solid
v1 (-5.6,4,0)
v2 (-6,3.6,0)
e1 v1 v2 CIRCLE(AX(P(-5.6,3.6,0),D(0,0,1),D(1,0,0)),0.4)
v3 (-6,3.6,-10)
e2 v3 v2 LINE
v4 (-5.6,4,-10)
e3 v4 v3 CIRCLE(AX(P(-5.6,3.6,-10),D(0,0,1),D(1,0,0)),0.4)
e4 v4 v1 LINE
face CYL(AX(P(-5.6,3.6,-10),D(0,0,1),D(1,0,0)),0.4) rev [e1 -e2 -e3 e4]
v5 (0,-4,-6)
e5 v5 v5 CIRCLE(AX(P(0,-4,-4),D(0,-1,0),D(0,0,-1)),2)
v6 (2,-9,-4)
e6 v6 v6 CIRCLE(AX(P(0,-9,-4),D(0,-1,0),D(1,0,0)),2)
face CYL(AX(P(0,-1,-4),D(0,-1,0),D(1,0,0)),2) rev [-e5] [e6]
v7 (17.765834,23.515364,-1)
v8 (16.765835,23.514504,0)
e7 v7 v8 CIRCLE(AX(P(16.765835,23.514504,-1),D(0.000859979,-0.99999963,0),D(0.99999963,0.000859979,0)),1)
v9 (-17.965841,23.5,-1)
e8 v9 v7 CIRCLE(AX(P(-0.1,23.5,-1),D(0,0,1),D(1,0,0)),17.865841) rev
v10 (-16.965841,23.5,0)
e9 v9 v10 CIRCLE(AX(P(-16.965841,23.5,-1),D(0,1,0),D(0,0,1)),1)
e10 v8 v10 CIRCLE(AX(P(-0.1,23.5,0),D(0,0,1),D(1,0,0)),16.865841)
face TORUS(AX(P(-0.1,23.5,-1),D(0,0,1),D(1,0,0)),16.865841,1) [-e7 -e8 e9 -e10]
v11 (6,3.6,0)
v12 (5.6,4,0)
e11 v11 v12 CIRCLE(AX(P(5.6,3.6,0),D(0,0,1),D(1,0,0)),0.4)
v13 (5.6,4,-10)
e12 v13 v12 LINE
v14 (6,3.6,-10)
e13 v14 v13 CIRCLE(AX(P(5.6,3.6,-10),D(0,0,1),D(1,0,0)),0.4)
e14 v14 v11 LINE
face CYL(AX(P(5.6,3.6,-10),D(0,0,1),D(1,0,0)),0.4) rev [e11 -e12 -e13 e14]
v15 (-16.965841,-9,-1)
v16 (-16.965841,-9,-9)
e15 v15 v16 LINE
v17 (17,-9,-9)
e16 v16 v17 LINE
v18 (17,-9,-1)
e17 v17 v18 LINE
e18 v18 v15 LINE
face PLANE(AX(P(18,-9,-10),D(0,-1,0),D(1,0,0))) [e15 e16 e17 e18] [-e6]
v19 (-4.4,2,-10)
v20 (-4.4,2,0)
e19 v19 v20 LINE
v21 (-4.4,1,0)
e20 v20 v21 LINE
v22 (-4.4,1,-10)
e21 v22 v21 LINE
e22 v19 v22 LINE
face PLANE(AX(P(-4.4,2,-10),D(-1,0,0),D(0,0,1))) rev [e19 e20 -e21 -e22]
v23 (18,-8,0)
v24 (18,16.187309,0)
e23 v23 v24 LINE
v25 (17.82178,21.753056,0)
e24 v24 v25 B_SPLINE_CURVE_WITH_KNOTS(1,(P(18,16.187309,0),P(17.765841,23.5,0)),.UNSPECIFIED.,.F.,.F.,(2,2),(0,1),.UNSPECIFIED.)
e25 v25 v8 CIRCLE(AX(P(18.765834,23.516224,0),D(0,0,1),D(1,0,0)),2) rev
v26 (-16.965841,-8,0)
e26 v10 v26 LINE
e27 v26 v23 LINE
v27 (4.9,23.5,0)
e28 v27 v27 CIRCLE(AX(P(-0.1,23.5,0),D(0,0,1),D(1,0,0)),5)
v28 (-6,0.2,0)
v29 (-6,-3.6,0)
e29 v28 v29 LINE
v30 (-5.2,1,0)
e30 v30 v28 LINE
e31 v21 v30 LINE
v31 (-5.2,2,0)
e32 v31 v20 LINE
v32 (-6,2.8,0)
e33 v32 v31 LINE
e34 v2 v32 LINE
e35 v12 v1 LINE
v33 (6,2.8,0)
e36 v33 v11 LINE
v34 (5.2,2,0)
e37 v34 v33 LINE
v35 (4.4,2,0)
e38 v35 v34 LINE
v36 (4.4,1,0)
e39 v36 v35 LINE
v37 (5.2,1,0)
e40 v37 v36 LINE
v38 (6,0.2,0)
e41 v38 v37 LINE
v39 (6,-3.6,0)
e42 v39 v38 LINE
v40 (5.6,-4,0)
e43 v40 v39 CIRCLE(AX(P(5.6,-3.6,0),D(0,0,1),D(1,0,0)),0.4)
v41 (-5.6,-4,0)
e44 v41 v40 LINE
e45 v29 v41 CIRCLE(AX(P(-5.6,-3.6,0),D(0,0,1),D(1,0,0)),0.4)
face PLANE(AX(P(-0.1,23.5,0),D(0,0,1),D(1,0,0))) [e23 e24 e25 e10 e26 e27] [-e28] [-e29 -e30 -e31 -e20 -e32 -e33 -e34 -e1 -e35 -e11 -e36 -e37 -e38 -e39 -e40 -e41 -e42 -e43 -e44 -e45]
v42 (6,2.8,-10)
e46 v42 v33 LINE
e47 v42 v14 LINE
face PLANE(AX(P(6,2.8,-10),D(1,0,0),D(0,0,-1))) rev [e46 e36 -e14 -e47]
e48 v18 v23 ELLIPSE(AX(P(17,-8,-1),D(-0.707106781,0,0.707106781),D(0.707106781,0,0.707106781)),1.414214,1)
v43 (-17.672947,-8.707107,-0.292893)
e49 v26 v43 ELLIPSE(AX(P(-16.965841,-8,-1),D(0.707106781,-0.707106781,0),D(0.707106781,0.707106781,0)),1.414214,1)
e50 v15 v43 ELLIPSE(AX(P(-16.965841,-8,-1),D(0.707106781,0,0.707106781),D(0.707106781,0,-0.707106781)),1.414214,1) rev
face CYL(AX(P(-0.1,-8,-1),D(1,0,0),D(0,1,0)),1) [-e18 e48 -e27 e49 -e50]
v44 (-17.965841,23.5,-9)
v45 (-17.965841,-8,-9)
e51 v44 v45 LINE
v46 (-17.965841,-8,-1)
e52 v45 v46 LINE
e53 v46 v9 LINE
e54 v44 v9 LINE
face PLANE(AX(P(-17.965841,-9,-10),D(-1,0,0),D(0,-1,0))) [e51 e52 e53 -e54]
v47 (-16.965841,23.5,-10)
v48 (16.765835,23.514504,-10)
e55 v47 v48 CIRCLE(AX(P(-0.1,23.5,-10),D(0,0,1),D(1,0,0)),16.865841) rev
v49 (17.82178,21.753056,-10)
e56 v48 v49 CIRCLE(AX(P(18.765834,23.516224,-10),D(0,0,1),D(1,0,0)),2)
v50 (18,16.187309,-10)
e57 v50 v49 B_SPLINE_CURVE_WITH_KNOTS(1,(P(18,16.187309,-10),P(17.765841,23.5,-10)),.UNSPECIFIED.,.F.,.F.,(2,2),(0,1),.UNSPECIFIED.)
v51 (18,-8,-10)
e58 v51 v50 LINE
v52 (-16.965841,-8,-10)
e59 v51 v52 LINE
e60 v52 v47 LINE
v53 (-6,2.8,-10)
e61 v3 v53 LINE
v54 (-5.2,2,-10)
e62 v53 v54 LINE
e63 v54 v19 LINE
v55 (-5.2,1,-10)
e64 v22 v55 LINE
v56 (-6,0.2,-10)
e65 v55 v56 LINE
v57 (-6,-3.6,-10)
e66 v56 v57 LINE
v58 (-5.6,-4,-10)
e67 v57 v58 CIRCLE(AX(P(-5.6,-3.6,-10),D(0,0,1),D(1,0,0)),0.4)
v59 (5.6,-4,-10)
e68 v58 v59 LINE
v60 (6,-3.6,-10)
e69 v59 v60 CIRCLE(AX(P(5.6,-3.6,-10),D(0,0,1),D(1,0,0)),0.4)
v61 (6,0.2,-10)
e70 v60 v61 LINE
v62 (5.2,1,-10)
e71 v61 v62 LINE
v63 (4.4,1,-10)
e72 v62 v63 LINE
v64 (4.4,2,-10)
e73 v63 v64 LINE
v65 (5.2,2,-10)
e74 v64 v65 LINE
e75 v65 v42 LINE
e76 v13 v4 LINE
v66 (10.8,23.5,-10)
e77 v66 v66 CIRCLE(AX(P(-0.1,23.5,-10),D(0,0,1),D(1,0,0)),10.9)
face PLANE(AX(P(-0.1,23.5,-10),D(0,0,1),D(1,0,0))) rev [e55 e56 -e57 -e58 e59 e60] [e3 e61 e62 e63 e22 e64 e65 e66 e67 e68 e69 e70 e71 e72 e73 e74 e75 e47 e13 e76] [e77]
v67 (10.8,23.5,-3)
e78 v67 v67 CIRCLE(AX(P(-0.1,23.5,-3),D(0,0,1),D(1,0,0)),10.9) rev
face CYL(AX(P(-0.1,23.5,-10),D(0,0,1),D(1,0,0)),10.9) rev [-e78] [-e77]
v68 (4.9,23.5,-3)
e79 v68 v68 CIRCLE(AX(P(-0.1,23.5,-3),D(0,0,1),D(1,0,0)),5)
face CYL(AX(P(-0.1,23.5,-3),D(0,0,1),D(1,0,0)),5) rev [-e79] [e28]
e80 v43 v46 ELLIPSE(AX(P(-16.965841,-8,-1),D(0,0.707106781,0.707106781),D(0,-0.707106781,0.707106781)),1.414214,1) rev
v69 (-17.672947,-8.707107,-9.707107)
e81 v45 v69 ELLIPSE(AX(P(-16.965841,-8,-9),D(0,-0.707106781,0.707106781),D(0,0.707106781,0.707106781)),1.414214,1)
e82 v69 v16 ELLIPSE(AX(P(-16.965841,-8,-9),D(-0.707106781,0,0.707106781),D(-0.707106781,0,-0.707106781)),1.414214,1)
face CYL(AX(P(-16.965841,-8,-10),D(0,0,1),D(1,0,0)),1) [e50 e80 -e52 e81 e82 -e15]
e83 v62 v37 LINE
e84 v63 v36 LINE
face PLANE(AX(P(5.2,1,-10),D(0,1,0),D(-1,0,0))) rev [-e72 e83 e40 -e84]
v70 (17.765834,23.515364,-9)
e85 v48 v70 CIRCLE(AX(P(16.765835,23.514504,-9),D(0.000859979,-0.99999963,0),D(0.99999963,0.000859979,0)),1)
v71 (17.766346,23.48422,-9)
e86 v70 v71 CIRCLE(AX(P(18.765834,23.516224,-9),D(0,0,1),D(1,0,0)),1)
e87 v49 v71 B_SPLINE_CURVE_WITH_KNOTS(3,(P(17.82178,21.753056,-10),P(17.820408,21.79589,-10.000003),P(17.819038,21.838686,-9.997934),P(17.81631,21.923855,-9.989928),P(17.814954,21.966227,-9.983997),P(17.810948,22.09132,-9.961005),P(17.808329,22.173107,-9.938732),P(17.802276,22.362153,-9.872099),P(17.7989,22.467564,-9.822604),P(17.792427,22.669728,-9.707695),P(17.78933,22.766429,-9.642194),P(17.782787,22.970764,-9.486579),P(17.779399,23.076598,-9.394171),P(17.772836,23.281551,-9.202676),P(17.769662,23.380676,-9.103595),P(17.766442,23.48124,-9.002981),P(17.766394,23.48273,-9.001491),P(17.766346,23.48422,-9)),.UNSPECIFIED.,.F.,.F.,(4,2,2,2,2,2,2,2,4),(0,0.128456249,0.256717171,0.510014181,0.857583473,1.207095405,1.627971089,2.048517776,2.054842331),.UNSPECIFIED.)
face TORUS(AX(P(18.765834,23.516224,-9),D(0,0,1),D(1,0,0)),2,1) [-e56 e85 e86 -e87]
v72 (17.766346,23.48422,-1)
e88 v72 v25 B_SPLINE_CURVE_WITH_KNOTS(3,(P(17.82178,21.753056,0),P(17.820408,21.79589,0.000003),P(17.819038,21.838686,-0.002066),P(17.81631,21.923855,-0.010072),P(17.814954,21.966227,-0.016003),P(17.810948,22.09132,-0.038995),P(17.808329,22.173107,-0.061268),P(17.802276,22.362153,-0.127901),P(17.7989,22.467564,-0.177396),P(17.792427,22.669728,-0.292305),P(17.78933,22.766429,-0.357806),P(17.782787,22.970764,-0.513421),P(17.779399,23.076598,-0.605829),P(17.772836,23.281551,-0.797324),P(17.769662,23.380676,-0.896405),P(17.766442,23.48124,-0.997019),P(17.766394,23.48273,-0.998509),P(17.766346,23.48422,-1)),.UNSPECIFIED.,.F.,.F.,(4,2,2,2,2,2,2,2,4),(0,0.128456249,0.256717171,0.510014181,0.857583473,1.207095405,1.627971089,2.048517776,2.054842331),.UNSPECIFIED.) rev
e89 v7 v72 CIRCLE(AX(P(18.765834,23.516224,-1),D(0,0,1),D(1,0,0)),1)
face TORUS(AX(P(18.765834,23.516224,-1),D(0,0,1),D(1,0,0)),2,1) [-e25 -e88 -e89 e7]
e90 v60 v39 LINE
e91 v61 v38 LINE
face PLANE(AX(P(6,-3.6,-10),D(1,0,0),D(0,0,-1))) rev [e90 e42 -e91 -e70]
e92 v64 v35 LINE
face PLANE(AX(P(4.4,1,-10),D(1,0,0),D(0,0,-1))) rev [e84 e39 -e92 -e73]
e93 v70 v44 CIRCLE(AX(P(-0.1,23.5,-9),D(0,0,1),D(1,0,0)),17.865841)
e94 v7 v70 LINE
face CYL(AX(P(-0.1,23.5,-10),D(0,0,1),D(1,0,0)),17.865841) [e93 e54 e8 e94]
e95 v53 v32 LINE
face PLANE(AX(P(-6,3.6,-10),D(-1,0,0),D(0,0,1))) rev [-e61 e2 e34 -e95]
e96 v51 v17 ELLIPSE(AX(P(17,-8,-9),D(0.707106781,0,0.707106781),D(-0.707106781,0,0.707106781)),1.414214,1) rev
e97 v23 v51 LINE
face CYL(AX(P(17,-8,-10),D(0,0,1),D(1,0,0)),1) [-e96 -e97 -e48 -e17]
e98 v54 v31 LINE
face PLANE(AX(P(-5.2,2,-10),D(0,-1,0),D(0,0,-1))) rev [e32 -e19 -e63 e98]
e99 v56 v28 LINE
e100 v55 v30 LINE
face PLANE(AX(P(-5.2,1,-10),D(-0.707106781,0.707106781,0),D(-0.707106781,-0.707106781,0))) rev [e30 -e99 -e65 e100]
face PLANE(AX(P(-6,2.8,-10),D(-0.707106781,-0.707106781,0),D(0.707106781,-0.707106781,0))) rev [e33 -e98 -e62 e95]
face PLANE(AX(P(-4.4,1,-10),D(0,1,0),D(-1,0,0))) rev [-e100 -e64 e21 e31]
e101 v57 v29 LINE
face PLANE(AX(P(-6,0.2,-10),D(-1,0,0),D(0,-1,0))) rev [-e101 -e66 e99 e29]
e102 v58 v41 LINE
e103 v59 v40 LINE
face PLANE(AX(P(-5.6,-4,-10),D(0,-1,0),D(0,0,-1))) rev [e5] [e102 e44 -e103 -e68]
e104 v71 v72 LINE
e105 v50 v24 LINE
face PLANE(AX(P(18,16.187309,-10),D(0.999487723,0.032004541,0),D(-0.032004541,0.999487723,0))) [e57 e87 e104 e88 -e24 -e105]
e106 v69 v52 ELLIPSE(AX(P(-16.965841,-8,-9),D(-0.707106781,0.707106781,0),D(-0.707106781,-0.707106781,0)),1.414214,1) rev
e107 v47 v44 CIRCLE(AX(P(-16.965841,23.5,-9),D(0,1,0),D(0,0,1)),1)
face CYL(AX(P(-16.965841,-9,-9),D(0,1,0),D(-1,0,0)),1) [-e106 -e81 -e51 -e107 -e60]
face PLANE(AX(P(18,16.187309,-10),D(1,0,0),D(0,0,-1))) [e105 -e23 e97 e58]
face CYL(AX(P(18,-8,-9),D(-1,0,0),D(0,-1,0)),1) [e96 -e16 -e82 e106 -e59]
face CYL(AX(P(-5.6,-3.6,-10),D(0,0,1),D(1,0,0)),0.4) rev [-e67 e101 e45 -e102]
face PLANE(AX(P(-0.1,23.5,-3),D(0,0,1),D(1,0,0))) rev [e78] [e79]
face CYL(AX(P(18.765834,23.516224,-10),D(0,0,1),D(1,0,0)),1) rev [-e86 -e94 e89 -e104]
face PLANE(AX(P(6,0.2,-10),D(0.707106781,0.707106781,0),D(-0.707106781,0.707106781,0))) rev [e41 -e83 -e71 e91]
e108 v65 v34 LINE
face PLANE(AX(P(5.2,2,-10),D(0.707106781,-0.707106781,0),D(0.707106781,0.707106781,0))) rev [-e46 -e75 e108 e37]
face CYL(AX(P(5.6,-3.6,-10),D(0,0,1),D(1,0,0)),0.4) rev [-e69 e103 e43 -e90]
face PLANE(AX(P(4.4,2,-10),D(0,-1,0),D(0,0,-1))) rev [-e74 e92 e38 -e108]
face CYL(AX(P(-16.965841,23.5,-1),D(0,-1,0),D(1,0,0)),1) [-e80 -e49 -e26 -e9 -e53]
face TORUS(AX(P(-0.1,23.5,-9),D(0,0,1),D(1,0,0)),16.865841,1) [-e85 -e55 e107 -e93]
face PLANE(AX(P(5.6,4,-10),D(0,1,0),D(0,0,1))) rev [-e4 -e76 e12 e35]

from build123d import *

# Parameters (mm, degrees)
SKETCH1_R           = 10.9
BOSS_EXTRUDE1_DEPTH = 10
FILLET5_R           = 1
FILLET1_R           = 1
SKETCH3_R           = 2
CUT_EXTRUDE2_DEPTH  = 8
SKETCH6_R           = 11.874719229
SKETCH6_R_2         = 5
BOSS_EXTRUDE3_DEPTH = 3


with BuildPart() as part:
    # Sketch1 → Boss-Extrude1 (new body)
    with BuildSketch(Plane.XY):
        with BuildLine():
            Line((18.000000111, 2.53629242), (18.000000111, -9))
            Line((18.000000111, -9), (-17.965840671, -9))
            Line((-17.965840671, -9), (-17.965840671, 23.5))
            ThreePointArc((-17.965840671, 23.5), (-0.099999918, 41.365840754), (17.765840836, 23.5))
            Line((17.765840836, 23.5), (18.000000111, 16.187309001))
            Line((18.000000111, 16.187309001), (18.000000111, 14.96196947))
            Line((18.000000111, 14.96196947), (18.000000111, 2.53629242))
        make_face()
        with Locations((-0.099999918, 23.5)):
            Circle(SKETCH1_R, mode=Mode.SUBTRACT)
        with BuildLine():
            Line((-4.4, 1), (-5.2, 1))
            Line((-5.2, 1), (-6, 0.2))
            Line((-6, 0.2), (-6, -3.6))
            ThreePointArc((-6, -3.6), (-5.882842712, -3.882842712), (-5.6, -4))
            Line((-5.6, -4), (5.6, -4))
            ThreePointArc((5.6, -4), (5.882842712, -3.882842712), (6, -3.6))
            Line((6, -3.6), (6, 0.2))
            Line((6, 0.2), (5.2, 1))
            Line((5.2, 1), (4.4, 1))
            Line((4.4, 1), (4.4, 2))
            Line((4.4, 2), (5.2, 2))
            Line((5.2, 2), (6, 2.8))
            Line((6, 2.8), (6, 3.6))
            ThreePointArc((6, 3.6), (5.882842712, 3.882842712), (5.6, 4))
            Line((5.6, 4), (-5.6, 4))
            ThreePointArc((-5.6, 4), (-5.882842712, 3.882842712), (-6, 3.6))
            Line((-6, 3.6), (-6, 2.8))
            Line((-6, 2.8), (-5.2, 2))
            Line((-5.2, 2), (-4.4, 2))
            Line((-4.4, 2), (-4.4, 1))
        make_face(mode=Mode.SUBTRACT)
    extrude(amount=-BOSS_EXTRUDE1_DEPTH)

    # Fillet5
    fillet5_edges = [part.edges().sort_by_distance(p)[0] for p in [
        (18.000000111, -9, -5),
        (-17.965840671, -9, -5),
        (0.01707972, -9, -10),
        (0.01707972, -9, 0),
    ]]
    fillet(fillet5_edges, radius=FILLET5_R)

    # Fillet1
    # the kernel refuses this fillet: 1 mm, written as the material it adds along each edge
    with BuildSketch(Plane(origin=(17.765840836, 23.5, 0), x_dir=(0.032004541259538756, -0.9994877234557543, 0), z_dir=(0, 0, -1))) as fillet1_piece_1:
        with BuildLine():
            CenterArc((0.015788393, -1), FILLET1_R, 90, 1.784765128)
            ThreePointArc((-0.015356597, -0.000485123), (-0.007678246, -0.000244212), (0, 0))
            Line((0, 0), (0.015788393, 0))
        make_face()
    extrude(amount=10)
    # the kernel refuses this fillet: 1 mm, written as the material it takes off along each edge
    with BuildSketch(Plane(origin=(-17.965840671, -10.5, -10), x_dir=(1, 0, 0), z_dir=(0, 1, 0)), Plane(origin=(-17.965840671, -10.5, 0), x_dir=(0, 0, -1), z_dir=(0, 1, 0))) as fillet1_2_piece_1:
        with BuildLine():
            CenterArc((FILLET1_R, -FILLET1_R), FILLET1_R, 90, 90)
            Line((0, -FILLET1_R), (0, 0))
            Line((0, 0), (FILLET1_R, 0))
        make_face()
    extrude(amount=34, mode=Mode.SUBTRACT)
    with BuildSketch(Plane(origin=(-0.099999918, 23.5, -10), x_dir=(-1, 0, 0), z_dir=(0, -1, 0))) as fillet1_2_piece_2:
        with BuildLine():
            CenterArc((17.865840754 - FILLET1_R, -FILLET1_R), FILLET1_R, 0, 90)
            Line((17.865840754, -FILLET1_R), (17.865840754, 0))
            Line((17.865840754, 0), (17.865840754 - FILLET1_R, 0))
        make_face()
    revolve(axis=Axis((-0.099999918, 23.5, -10), (0, 0, -1)), revolution_arc=179.950726799, mode=Mode.SUBTRACT)
    with BuildSketch(Plane(origin=(-0.099999918, 23.5, 0), x_dir=(-1, 0, 0), z_dir=(0, -1, 0))) as fillet1_2_piece_3:
        with BuildLine():
            CenterArc((17.865840754 - FILLET1_R, FILLET1_R), FILLET1_R, 270, 90)
            Line((17.865840754 - FILLET1_R, 0), (17.865840754, 0))
            Line((17.865840754, 0), (17.865840754, FILLET1_R))
        make_face()
    revolve(axis=Axis((-0.099999918, 23.5, 0), (0, 0, -1)), revolution_arc=179.950726799, mode=Mode.SUBTRACT)
    with BuildSketch(Plane(origin=(18.76583386, 23.516224236, 0), x_dir=(0.8198872609406254, -0.5725250032507568, 0), z_dir=(0.5725250032507568, 0.8198872609406254, 0))) as fillet1_2_piece_4:
        with BuildLine():
            CenterArc((1 + FILLET1_R, FILLET1_R), FILLET1_R, 180, 90)
            Line((1, FILLET1_R), (1, 0))
            Line((1, 0), (1 + FILLET1_R, 0))
        make_face()
    revolve(axis=Axis((18.76583386, 23.516224236, 0), (0, 0, -1)), revolution_arc=145.024236532, mode=Mode.SUBTRACT)
    with BuildSketch(Plane(origin=(18.76583386, 23.516224236, -10), x_dir=(0.8198872609406254, -0.5725250032507568, 0), z_dir=(0.5725250032507568, 0.8198872609406254, 0))) as fillet1_2_piece_5:
        with BuildLine():
            CenterArc((1 + FILLET1_R, -FILLET1_R), FILLET1_R, 90, 90)
            Line((1, -FILLET1_R), (1, 0))
            Line((1, 0), (1 + FILLET1_R, 0))
        make_face()
    revolve(axis=Axis((18.76583386, 23.516224236, -10), (0, 0, -1)), revolution_arc=145.024236532, mode=Mode.SUBTRACT)

    # Sketch3 → Cut-Extrude2 (cut)
    with BuildSketch(Plane.XZ.offset(9)):
        with Locations((0, -4)):
            Circle(SKETCH3_R)
    extrude(amount=-CUT_EXTRUDE2_DEPTH, mode=Mode.SUBTRACT)

    # Sketch6 → Boss-Extrude3 (add)
    with BuildSketch(Plane.XY):
        with Locations((-0.099999918, 23.5)):
            Circle(SKETCH6_R)
        with Locations((-0.099999918, 23.5)):
            Circle(SKETCH6_R_2, mode=Mode.SUBTRACT)
    extrude(amount=-BOSS_EXTRUDE3_DEPTH)


solid = part.part
